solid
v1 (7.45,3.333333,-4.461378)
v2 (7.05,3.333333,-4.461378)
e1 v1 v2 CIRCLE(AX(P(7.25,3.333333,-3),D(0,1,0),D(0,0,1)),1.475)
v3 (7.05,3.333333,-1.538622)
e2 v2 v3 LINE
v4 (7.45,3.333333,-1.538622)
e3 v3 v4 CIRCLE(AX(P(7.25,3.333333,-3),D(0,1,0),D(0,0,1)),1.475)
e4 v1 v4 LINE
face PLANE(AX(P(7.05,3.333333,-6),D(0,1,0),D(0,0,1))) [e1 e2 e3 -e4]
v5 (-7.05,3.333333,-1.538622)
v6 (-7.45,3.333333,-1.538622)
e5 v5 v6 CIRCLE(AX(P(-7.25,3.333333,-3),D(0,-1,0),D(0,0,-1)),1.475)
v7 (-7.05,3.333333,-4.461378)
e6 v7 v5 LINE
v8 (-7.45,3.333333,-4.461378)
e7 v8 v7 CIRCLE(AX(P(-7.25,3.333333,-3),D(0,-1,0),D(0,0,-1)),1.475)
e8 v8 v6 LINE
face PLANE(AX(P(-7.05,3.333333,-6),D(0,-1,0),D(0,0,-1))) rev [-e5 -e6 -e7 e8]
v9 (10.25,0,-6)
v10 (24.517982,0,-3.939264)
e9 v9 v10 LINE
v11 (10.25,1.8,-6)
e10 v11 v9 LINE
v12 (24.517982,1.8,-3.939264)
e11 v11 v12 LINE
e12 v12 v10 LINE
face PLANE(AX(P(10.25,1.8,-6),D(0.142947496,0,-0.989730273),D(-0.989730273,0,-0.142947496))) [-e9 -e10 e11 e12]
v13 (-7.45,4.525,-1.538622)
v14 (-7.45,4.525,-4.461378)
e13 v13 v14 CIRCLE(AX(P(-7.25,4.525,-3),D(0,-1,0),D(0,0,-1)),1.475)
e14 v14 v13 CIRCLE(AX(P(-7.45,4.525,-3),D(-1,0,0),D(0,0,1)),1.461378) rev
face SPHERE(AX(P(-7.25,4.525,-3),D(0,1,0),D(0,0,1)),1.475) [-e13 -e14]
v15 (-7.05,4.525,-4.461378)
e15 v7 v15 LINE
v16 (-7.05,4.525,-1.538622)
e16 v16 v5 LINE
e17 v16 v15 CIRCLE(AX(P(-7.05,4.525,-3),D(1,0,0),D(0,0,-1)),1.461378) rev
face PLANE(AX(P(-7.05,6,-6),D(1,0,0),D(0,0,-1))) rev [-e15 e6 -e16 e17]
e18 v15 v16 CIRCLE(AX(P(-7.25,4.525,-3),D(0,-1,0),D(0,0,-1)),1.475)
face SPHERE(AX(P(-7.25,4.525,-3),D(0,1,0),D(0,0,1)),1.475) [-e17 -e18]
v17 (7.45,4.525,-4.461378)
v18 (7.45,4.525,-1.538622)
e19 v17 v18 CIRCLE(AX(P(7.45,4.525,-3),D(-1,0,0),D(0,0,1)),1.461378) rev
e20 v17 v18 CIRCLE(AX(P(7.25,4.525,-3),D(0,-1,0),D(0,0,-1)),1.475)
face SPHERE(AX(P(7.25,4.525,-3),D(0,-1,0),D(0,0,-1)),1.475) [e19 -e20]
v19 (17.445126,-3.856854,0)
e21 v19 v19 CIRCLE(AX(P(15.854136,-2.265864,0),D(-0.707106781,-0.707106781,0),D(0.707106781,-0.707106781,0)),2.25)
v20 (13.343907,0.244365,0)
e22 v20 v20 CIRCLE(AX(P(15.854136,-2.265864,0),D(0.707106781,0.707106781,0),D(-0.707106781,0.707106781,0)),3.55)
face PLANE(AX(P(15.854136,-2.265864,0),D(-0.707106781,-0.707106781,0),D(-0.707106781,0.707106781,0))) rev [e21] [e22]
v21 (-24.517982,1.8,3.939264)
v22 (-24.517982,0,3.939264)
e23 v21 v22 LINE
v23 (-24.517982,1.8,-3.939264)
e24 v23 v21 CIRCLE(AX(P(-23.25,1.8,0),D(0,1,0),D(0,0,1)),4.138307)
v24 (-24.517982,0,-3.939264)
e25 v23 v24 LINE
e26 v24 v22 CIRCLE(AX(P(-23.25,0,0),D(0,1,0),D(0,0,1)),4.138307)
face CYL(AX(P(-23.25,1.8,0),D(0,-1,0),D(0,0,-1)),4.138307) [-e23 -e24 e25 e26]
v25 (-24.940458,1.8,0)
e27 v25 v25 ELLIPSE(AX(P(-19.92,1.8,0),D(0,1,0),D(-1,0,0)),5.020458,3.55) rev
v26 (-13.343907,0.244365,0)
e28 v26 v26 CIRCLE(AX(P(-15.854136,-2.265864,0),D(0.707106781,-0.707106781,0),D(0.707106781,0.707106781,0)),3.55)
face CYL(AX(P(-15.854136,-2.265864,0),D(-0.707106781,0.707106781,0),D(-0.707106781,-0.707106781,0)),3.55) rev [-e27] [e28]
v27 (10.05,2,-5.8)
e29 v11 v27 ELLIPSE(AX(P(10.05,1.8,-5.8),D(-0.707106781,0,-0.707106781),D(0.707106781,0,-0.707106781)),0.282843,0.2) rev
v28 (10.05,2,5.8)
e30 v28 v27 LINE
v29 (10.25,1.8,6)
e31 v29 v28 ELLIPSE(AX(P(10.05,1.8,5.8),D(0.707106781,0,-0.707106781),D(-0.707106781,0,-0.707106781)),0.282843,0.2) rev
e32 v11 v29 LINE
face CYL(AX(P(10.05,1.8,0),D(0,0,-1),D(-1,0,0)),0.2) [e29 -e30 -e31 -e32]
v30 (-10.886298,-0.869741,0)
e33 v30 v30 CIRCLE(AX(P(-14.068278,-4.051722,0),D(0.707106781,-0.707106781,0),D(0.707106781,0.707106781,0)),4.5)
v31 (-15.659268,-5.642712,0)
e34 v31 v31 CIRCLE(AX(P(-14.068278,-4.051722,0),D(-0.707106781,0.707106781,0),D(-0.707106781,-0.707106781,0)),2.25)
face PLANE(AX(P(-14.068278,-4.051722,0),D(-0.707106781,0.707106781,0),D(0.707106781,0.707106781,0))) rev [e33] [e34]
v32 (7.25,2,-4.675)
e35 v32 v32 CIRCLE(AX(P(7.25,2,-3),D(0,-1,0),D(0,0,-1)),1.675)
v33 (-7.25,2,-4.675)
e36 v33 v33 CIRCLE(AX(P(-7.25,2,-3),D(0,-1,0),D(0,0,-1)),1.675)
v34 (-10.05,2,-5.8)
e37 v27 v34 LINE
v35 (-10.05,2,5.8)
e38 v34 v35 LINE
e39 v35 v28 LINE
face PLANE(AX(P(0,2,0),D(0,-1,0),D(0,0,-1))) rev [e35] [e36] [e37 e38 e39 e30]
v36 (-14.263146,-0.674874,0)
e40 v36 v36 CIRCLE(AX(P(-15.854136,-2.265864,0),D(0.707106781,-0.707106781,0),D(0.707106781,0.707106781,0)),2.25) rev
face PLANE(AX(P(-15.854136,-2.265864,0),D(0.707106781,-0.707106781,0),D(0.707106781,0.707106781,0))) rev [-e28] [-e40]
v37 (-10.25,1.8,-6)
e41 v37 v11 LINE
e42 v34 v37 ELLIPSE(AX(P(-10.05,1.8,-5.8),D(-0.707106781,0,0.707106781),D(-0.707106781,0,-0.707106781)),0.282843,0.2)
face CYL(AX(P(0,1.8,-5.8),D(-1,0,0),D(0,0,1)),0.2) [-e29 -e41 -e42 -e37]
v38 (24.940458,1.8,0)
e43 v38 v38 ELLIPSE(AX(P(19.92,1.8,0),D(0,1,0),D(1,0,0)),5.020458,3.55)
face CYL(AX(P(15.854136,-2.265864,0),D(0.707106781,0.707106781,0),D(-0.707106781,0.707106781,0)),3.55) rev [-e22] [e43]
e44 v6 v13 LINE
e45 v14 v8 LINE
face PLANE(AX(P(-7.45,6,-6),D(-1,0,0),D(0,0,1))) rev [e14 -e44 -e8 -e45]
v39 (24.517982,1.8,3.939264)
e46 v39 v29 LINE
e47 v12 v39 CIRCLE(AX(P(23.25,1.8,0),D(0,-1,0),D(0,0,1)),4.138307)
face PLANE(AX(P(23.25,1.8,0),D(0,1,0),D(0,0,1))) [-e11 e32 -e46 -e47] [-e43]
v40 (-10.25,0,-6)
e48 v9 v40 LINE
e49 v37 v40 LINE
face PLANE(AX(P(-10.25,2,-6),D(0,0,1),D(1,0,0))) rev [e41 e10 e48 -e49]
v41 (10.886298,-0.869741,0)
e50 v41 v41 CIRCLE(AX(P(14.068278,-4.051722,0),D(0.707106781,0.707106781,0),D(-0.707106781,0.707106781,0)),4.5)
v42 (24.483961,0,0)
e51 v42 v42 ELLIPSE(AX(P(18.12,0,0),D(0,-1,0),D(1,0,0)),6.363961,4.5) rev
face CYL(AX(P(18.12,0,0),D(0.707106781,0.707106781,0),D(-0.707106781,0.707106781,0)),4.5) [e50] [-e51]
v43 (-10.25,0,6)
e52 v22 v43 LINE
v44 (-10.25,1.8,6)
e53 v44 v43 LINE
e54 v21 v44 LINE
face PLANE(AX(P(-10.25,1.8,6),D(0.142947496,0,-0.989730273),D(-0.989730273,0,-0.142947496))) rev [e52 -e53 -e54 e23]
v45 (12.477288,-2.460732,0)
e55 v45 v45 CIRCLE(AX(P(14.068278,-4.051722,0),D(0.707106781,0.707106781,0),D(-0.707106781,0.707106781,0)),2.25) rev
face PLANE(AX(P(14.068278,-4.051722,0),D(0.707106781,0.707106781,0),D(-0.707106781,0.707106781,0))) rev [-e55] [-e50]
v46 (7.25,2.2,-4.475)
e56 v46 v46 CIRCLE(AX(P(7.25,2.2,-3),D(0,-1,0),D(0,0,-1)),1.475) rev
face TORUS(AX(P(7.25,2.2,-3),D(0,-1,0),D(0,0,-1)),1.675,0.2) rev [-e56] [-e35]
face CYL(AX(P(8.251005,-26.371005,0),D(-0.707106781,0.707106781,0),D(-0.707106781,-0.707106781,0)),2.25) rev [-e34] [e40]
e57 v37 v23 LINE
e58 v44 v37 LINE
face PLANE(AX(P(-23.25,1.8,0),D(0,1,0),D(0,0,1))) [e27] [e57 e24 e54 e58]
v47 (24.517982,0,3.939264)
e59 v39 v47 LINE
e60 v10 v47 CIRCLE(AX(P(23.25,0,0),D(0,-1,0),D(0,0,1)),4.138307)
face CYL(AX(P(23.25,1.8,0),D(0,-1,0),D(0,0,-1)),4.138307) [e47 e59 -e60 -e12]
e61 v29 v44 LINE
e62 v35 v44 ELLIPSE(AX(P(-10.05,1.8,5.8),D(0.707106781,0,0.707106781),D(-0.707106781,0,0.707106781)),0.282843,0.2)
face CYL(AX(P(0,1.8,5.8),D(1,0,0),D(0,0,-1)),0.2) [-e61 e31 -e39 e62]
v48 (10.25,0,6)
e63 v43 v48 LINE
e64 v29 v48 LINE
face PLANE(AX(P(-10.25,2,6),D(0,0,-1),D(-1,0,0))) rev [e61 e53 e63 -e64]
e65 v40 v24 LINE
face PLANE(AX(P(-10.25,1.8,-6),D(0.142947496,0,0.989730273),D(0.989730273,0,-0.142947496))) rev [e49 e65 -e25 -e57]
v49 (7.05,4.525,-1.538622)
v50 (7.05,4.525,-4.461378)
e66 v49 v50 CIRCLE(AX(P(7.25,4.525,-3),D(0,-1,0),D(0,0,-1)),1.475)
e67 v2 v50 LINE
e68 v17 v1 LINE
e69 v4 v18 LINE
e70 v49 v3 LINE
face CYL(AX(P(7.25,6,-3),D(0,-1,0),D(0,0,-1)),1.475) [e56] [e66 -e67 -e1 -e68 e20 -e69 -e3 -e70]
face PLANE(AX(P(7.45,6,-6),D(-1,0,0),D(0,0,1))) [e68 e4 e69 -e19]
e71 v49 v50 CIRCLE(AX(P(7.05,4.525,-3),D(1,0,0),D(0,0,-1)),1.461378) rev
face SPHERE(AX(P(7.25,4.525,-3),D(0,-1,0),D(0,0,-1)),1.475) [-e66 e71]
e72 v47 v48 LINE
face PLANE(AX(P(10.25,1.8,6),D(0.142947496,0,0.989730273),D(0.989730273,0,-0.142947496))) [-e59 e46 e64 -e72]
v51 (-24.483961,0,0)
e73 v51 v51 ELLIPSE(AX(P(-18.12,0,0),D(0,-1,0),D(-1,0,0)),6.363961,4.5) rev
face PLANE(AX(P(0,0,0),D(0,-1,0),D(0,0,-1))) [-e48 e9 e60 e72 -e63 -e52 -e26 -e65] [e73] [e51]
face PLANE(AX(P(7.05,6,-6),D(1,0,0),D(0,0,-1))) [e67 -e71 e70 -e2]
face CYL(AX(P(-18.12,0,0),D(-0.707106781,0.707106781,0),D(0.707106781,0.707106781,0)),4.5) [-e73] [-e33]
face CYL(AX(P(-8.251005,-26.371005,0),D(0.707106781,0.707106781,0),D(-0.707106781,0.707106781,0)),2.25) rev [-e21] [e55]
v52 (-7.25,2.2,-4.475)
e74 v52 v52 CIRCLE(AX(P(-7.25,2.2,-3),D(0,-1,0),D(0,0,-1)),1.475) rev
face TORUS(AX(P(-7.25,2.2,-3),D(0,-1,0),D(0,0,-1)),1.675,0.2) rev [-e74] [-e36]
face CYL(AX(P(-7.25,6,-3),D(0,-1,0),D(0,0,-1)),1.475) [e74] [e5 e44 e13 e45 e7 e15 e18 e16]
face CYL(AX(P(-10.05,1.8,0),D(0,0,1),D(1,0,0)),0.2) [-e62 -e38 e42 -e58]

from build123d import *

# Parameters (mm, degrees)
SKETCH1_W           = 20.5
SKETCH1_H           = 12
BOSS_EXTRUDE2_DEPTH = 2
SKETCH2_R           = 1.475
BOSS_EXTRUDE3_DEPTH = 4
FILLET1_R           = 1.475
FILLET2_R           = 0.2
BOSS_EXTRUDE4_DEPTH = 1.8
SKETCH6_R           = 2.25
CUT_EXTRUDE1_DEPTH  = 36.148325783
SKETCH7_W           = 18.806014856
SKETCH7_H           = 6.487022836
CUT_EXTRUDE2_DEPTH  = 29.955928605
SKETCH14_R          = 3.55
CUT_EXTRUDE4_DEPTH  = 8
CUT_EXTRUDE5_START  = -6
CUT_EXTRUDE5_DEPTH  = 6
SKETCH15_W          = 0.4
SKETCH15_H          = 2.666666667
CUT_EXTRUDE6_DEPTH  = 31.764359271


with BuildPart() as part:
    # Sketch1 → Boss-Extrude2 (new body)
    with BuildSketch(Plane(origin=(0, 0, 0), x_dir=(1, 0, 0), z_dir=(0, 1, 0))):
        Rectangle(SKETCH1_W, SKETCH1_H)
    extrude(amount=BOSS_EXTRUDE2_DEPTH)

    # Sketch2 → Boss-Extrude3 (add)
    with BuildSketch(Plane(origin=(0, 2, 0), x_dir=(1, 0, 0), z_dir=(0, 1, 0))):
        with Locations((-7.25, 3)):
            Circle(SKETCH2_R)
        with Locations((7.25, 3)):
            Circle(SKETCH2_R)
    extrude(amount=BOSS_EXTRUDE3_DEPTH)

    # Fillet1
    fillet1_edges = [part.edges().sort_by_distance(p)[0] for p in [
        (5.775, 6, -3),
        (-8.725, 6, -3),
    ]]
    fillet(fillet1_edges, radius=FILLET1_R)

    # Fillet2
    fillet2_edges = [part.edges().sort_by_distance(p)[0] for p in [
        (0, 2, 6),
        (-10.25, 2, 0),
        (0, 2, -6),
        (10.25, 2, 0),
        (-8.725, 2, -3),
        (5.775, 2, -3),
    ]]
    fillet(fillet2_edges, radius=FILLET2_R)

    # Sketch3 → Boss-Extrude4 (add)
    with BuildSketch(Plane.XZ):
        with BuildLine():
            Line((10.25, -6), (24.517982167, -3.939264487))
            ThreePointArc((24.517982167, -3.939264487), (27.388306837, 0), (24.517982167, 3.939264487))
            Line((24.517982167, 3.939264487), (10.25, 6))
            Line((10.25, 6), (10.25, 0))
            Line((10.25, 0), (10.25, -6))
        make_face()
    boss_extrude4 = extrude(amount=-BOSS_EXTRUDE4_DEPTH)

    # Mirror1: Boss-Extrude4 across plane
    add(boss_extrude4.mirror(Plane(origin=(0, 0, 0), x_dir=(0, 0, 1), z_dir=(1, 0, 0))))

    # Sketch4 → Revolve2 (revolve)
    with BuildSketch(Plane.XY):
        Polygon((14.068278144, -4.051721856), (17.250258659, -7.233702372), (24.483961031, 0), (18.12, 0), align=None)
    revolve2 = revolve(axis=Axis((18.12, 0, 0), (-0.7071067811865459, -0.7071067811865492, 0)))

    # Mirror2: Revolve2 across plane
    add(revolve2.mirror(Plane(origin=(0, 0, 0), x_dir=(0, 0, 1), z_dir=(1, 0, 0))))

    # Sketch6 → Cut-Extrude1 (cut, symmetric)
    with BuildSketch(Plane(origin=(5.008278144, 5.008278144, 0), x_dir=(0, 0, 1), z_dir=(-0.707106781186546, -0.707106781186549, 0))):
        with Locations((0, -12.812774875)):
            Circle(SKETCH6_R)
    cut_extrude1 = extrude(amount=CUT_EXTRUDE1_DEPTH, both=True, mode=Mode.SUBTRACT)

    # Mirror3: Cut-Extrude1 across plane
    add(cut_extrude1.mirror(Plane(origin=(0, 0, 0), x_dir=(0, 0, 1), z_dir=(1, 0, 0))), mode=Mode.SUBTRACT)

    # Sketch7 → Cut-Extrude2 (cut, symmetric)
    with BuildSketch(Plane.XY):
        with Locations((19.653007428, 5.043511418)):
            Rectangle(SKETCH7_W, SKETCH7_H)
    cut_extrude2 = extrude(amount=CUT_EXTRUDE2_DEPTH, both=True, mode=Mode.SUBTRACT)

    # Mirror4: Cut-Extrude2 across plane
    add(cut_extrude2.mirror(Plane(origin=(0, 0, 0), x_dir=(0, 0, 1), z_dir=(1, 0, 0))), mode=Mode.SUBTRACT)

    # Sketch14 → Cut-Extrude4 (cut)
    with BuildSketch(Plane(origin=(-12.450990258, 12.450990258, 0), x_dir=(0, 0, -1), z_dir=(0.7071067811865438, -0.7071067811865512, 0))):
        with Locations((0, -12.812774875)):
            Circle(SKETCH14_R)
    cut_extrude4 = extrude(amount=CUT_EXTRUDE4_DEPTH, mode=Mode.SUBTRACT)

    # Sketch14 → Cut-Extrude5 (cut)
    with BuildSketch(Plane(origin=(-12.450990258, 12.450990258, 0), x_dir=(0, 0, -1), z_dir=(0.7071067811865438, -0.7071067811865512, 0)).offset(CUT_EXTRUDE5_START)):
        with Locations((0, -12.812774875)):
            Circle(SKETCH14_R)
    cut_extrude5 = extrude(amount=CUT_EXTRUDE5_DEPTH, mode=Mode.SUBTRACT)

    # Mirror5: Cut-Extrude4, Cut-Extrude5 across plane
    add(cut_extrude4.mirror(Plane(origin=(0, 0, 0), x_dir=(0, 0, 1), z_dir=(1, 0, 0))), mode=Mode.SUBTRACT)
    add(cut_extrude5.mirror(Plane(origin=(0, 0, 0), x_dir=(0, 0, 1), z_dir=(1, 0, 0))), mode=Mode.SUBTRACT)

    # Sketch15 → Cut-Extrude6 (cut, symmetric)
    with BuildSketch(Plane.XY.offset(6)):
        with Locations((-7.25, 4.666666667)):
            Rectangle(SKETCH15_W, SKETCH15_H)
    cut_extrude6 = extrude(amount=CUT_EXTRUDE6_DEPTH, both=True, mode=Mode.SUBTRACT)

    # Mirror6: Cut-Extrude6 across plane
    add(cut_extrude6.mirror(Plane(origin=(0, 0, 0), x_dir=(0, 0, 1), z_dir=(1, 0, 0))), mode=Mode.SUBTRACT)


solid = part.part
